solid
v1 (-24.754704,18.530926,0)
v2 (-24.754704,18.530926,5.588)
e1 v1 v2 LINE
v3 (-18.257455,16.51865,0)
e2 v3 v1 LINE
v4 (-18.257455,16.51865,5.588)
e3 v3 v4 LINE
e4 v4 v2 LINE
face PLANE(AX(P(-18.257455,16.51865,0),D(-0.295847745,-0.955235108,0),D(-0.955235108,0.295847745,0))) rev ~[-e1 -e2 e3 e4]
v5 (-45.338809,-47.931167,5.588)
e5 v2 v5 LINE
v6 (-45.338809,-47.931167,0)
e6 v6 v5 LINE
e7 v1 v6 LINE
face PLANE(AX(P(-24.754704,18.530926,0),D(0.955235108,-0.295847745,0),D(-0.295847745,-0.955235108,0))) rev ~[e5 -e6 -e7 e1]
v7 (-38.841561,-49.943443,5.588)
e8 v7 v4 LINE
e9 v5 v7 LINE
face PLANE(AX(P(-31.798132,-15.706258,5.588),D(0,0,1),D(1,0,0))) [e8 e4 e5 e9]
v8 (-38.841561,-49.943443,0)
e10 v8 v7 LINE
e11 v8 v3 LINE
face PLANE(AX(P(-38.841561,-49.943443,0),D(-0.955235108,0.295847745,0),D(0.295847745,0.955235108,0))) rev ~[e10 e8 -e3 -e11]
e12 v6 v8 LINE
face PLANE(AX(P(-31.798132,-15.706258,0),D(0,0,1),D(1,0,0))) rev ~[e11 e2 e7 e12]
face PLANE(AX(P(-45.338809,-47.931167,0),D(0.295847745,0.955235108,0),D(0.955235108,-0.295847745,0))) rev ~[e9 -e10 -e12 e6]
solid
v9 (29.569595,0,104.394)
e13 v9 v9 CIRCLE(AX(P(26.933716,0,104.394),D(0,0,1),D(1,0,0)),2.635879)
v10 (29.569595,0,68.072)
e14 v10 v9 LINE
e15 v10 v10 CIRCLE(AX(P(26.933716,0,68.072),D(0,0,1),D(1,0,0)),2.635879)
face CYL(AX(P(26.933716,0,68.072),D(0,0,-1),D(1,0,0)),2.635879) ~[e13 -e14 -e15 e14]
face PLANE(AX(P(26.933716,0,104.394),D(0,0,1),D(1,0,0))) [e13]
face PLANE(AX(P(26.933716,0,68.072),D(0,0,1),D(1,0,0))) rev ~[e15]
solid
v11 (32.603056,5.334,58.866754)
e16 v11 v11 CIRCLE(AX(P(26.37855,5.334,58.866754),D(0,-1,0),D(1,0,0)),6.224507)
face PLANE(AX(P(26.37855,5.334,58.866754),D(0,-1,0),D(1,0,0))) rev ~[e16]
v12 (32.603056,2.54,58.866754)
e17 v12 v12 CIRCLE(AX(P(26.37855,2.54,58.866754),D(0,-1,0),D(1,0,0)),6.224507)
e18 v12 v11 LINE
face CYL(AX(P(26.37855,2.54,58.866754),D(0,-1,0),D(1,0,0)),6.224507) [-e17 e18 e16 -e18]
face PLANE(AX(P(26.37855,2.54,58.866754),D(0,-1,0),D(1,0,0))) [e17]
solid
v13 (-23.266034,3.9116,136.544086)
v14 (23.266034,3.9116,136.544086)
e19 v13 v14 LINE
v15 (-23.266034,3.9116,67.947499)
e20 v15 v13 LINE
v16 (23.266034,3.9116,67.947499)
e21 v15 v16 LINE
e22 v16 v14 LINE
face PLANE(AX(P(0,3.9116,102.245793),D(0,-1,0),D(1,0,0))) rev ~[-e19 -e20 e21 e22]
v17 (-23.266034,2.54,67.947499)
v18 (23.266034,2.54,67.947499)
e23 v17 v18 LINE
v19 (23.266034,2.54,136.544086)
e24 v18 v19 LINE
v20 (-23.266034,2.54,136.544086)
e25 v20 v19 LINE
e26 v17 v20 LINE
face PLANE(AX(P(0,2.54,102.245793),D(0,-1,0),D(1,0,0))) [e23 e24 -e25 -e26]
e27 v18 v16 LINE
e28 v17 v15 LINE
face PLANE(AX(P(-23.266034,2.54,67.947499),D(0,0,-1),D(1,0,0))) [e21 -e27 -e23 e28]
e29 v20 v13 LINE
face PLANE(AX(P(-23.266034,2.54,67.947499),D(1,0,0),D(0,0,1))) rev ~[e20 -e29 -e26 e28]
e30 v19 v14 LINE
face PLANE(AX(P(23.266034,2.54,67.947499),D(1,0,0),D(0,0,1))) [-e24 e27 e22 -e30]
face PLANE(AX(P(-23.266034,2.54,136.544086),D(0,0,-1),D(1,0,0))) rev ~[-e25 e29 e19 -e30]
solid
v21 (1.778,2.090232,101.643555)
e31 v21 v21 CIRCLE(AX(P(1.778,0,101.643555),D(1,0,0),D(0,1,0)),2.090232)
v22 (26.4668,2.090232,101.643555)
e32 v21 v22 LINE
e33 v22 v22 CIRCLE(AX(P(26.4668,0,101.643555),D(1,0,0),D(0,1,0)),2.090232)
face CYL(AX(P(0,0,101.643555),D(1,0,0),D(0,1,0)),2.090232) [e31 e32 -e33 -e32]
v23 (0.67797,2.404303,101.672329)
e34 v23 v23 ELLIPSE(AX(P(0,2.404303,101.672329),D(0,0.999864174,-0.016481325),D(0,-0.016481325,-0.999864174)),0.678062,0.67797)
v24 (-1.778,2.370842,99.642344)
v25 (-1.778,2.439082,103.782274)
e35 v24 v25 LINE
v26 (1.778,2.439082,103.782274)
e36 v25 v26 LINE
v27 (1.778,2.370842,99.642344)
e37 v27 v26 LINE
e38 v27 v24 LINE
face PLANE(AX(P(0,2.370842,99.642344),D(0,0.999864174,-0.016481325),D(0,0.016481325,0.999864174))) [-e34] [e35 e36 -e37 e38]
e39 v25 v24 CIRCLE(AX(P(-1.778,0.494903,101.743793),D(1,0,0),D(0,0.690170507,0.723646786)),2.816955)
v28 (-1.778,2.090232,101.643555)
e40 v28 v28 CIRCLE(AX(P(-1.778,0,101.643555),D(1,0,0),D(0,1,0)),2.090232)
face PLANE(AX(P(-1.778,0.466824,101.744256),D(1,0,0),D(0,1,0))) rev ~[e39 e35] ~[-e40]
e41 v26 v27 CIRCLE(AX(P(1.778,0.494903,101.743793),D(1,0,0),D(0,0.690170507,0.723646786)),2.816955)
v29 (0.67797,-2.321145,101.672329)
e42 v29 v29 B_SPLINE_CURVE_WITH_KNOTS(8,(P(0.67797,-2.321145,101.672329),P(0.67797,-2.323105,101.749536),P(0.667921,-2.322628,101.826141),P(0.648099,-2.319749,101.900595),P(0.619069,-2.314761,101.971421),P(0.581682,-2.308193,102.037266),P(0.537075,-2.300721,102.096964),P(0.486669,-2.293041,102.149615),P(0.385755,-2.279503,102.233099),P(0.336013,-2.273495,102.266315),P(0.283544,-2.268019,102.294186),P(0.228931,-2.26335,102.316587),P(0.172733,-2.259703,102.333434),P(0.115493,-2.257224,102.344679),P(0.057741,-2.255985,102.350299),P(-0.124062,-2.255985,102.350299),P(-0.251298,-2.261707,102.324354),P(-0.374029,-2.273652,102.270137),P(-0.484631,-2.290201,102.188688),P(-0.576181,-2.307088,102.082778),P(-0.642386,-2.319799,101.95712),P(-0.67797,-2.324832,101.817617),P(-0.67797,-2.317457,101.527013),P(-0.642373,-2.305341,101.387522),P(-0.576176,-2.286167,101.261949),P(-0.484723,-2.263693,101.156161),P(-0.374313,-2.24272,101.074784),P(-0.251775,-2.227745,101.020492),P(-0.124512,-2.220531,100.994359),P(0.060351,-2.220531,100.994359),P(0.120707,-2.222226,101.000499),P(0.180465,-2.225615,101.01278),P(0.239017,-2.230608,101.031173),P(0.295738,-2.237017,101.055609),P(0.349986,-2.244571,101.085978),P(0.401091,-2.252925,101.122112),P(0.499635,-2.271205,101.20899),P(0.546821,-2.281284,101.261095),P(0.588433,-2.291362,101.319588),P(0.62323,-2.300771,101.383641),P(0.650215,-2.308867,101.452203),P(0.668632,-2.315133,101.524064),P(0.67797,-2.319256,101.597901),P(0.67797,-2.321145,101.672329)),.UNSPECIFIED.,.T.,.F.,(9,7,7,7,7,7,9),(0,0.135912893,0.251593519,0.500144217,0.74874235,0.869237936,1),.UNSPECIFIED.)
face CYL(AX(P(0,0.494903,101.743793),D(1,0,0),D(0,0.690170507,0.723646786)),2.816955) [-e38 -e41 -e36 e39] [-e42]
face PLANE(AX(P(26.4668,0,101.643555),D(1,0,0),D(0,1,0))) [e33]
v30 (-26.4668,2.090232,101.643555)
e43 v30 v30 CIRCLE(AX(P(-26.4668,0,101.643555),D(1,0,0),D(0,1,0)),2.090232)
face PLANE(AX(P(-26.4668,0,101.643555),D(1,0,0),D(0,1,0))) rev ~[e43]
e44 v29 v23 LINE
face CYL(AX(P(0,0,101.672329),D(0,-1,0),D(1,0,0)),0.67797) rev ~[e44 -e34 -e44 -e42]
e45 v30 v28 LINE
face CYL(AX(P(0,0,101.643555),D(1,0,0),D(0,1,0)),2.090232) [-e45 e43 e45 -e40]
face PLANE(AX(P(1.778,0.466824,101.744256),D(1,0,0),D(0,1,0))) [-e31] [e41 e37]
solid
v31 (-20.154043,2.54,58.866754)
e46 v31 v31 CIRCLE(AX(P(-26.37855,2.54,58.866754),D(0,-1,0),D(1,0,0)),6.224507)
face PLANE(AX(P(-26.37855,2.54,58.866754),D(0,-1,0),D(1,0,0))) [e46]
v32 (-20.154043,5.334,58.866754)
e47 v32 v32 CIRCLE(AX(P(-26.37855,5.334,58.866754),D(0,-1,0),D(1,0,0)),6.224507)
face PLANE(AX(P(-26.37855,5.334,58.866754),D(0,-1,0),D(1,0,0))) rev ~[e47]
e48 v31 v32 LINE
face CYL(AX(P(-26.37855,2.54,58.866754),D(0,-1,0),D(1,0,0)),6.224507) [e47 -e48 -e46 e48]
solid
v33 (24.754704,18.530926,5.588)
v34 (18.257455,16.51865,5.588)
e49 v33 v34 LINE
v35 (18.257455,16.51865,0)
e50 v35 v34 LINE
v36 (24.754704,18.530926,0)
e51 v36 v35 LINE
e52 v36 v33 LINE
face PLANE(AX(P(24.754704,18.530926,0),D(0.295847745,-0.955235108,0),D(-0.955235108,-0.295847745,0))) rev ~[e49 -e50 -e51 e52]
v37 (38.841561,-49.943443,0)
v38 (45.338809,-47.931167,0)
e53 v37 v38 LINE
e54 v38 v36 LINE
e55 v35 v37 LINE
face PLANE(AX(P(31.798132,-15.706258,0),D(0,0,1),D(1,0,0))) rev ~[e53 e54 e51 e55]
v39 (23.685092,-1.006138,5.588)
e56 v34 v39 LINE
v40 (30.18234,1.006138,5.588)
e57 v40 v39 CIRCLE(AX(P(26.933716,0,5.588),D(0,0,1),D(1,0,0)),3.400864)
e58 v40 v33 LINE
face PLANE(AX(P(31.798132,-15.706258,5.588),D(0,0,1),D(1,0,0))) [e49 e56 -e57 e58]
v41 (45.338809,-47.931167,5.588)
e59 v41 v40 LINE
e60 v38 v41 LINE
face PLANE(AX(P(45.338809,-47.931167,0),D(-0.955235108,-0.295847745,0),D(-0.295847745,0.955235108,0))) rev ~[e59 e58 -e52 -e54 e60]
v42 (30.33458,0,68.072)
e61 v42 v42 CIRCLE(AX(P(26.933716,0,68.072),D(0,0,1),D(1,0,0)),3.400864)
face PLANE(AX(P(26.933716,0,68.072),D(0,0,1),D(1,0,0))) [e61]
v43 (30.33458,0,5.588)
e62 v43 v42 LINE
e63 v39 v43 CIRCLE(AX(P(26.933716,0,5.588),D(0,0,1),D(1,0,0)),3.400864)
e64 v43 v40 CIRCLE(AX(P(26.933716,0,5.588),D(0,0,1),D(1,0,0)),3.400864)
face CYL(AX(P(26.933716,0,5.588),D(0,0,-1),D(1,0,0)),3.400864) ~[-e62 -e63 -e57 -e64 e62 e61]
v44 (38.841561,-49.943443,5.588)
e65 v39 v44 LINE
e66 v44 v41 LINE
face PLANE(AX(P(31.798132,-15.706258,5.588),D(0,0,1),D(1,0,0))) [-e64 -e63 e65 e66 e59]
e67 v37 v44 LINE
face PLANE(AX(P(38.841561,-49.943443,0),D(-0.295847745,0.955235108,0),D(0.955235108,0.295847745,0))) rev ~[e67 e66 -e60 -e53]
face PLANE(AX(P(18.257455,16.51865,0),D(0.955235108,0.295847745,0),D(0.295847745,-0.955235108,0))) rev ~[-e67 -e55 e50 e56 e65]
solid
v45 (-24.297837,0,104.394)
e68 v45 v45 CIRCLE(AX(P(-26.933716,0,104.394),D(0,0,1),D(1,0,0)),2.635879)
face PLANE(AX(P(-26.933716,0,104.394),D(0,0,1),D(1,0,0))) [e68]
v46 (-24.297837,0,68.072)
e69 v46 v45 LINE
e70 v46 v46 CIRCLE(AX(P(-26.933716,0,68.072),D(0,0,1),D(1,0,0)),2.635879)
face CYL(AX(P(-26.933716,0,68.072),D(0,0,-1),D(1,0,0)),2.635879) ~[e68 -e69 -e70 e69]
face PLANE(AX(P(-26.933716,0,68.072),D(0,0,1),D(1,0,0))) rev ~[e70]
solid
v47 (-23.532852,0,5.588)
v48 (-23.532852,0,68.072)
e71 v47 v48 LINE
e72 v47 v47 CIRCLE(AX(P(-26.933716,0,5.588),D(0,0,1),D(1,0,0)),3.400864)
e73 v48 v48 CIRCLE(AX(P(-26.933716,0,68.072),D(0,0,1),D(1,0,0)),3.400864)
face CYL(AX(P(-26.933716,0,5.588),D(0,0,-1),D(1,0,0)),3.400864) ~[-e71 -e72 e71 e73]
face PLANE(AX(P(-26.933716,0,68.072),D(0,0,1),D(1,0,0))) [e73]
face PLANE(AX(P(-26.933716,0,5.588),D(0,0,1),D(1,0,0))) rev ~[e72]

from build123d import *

# Parameters (mm, degrees)
F1_DEPTH  = 5.588
F2_R      = 3.400863531
F3_DEPTH  = 62.484
F4_R      = 2.6358793968
F5_DEPTH  = 36.322
F6_R      = 2.0902316786
F7_DEPTH  = 26.4668
F9_W      = 46.5320684016
F9_H      = 68.596586585
F10_DEPTH = 1.3716
F11_R     = 6.2245067114
F12_DEPTH = 2.794
F14_DEPTH = 1.778
F15_R     = 0.6779698322
F16_DEPTH = 3.7084
F17_DEPTH = 6.1214


with BuildPart() as f1:
    # F0 (on Top) → F1 (new body)
    with BuildSketch(Plane.XY):
        Polygon((24.754703592, 18.5309260663), (18.2574551058, 16.5186504552), (38.8415608429, -49.9434430581), (45.338809329, -47.931167447), align=None)
    extrude(amount=F1_DEPTH)

    # F2 (on face) → F3 (join)
    with BuildSketch(Plane.XY.offset(5.588)):
        with Locations((26.9337159988, 0)):
            Circle(F2_R)
    extrude(amount=F3_DEPTH)


with BuildPart() as f1b:
    # F0 (on Top) → F1, piece 2 (new body)
    with BuildSketch(Plane.XY):
        Polygon((-24.754703592, 18.5309260663), (-45.338809329, -47.931167447), (-38.8415608429, -49.9434430581), (-18.2574551058, 16.5186504552), align=None)
    extrude(amount=F1_DEPTH)


with BuildPart() as f3:
    # F2 (on face) → F3, piece 2 (new body)
    with BuildSketch(Plane.XY.offset(5.588)):
        with Locations((-26.9337159988, 0)):
            Circle(F2_R)
    extrude(amount=F3_DEPTH)


with BuildPart() as f5:
    # F4 (on face) → F5 (new body)
    with BuildSketch(Plane.XY.offset(68.072)):
        with Locations((26.9337159988, 0)):
            Circle(F4_R)
    extrude(amount=F5_DEPTH)


with BuildPart() as f5b:
    # F4 (on face) → F5, piece 2 (new body)
    with BuildSketch(Plane.XY.offset(68.072)):
        with Locations((-26.9337159988, 0)):
            Circle(F4_R)
    extrude(amount=F5_DEPTH)


with BuildPart() as f7:
    # F6 (on Right) → F7 (new body, symmetric)
    with BuildSketch(Plane.YZ):
        with Locations((0, 101.6435548663)):
            Circle(F6_R)
    extrude(amount=F7_DEPTH, both=True)

    # F13 (on Right) → F14 (join, symmetric)
    with BuildSketch(Plane.YZ):
        with BuildLine():
            Line((2.3708415683, 99.6423438191), (2.4390823673, 103.782273829))
            ThreePointArc((2.4390823673, 103.782273829), (-2.3216692714, 101.79022055), (2.3708415683, 99.6423438191))
        make_face()
    extrude(amount=F14_DEPTH, both=True)

    # F15 (on Front) → F16 (cut)
    with BuildSketch(Plane.XZ):
        with Locations((0, 101.6723290086)):
            Circle(F15_R)
    extrude(amount=F16_DEPTH, mode=Mode.SUBTRACT)

    # F17 (cut): a face of the model
    f17_faces = [f7.faces().sort_by_distance(p)[0] for p in [
        (0, 0, 101.6723290086),
    ]]
    extrude(f17_faces, amount=-F17_DEPTH, mode=Mode.SUBTRACT)


with BuildPart() as f10:
    # F9 (on offset) → F10 (new body)
    with BuildSketch(Plane.XZ.offset(-2.54)):
        with Locations((0, 102.2457927465)):
            Rectangle(F9_W, F9_H)
    extrude(amount=-F10_DEPTH)


with BuildPart() as f12:
    # F11 (on offset) → F12 (new body)
    with BuildSketch(Plane.XZ.offset(-2.54)):
        with Locations((26.3785496354, 58.8667541742)):
            Circle(F11_R)
    extrude(amount=-F12_DEPTH)


with BuildPart() as f12b:
    # F11 (on offset) → F12, piece 2 (new body)
    with BuildSketch(Plane.XZ.offset(-2.54)):
        with Locations((-26.3785496354, 58.8667541742)):
            Circle(F11_R)
    extrude(amount=-F12_DEPTH)


solid = Compound([f1.part, f1b.part, f3.part, f5.part, f5b.part, f7.part, f10.part, f12.part, f12b.part])
